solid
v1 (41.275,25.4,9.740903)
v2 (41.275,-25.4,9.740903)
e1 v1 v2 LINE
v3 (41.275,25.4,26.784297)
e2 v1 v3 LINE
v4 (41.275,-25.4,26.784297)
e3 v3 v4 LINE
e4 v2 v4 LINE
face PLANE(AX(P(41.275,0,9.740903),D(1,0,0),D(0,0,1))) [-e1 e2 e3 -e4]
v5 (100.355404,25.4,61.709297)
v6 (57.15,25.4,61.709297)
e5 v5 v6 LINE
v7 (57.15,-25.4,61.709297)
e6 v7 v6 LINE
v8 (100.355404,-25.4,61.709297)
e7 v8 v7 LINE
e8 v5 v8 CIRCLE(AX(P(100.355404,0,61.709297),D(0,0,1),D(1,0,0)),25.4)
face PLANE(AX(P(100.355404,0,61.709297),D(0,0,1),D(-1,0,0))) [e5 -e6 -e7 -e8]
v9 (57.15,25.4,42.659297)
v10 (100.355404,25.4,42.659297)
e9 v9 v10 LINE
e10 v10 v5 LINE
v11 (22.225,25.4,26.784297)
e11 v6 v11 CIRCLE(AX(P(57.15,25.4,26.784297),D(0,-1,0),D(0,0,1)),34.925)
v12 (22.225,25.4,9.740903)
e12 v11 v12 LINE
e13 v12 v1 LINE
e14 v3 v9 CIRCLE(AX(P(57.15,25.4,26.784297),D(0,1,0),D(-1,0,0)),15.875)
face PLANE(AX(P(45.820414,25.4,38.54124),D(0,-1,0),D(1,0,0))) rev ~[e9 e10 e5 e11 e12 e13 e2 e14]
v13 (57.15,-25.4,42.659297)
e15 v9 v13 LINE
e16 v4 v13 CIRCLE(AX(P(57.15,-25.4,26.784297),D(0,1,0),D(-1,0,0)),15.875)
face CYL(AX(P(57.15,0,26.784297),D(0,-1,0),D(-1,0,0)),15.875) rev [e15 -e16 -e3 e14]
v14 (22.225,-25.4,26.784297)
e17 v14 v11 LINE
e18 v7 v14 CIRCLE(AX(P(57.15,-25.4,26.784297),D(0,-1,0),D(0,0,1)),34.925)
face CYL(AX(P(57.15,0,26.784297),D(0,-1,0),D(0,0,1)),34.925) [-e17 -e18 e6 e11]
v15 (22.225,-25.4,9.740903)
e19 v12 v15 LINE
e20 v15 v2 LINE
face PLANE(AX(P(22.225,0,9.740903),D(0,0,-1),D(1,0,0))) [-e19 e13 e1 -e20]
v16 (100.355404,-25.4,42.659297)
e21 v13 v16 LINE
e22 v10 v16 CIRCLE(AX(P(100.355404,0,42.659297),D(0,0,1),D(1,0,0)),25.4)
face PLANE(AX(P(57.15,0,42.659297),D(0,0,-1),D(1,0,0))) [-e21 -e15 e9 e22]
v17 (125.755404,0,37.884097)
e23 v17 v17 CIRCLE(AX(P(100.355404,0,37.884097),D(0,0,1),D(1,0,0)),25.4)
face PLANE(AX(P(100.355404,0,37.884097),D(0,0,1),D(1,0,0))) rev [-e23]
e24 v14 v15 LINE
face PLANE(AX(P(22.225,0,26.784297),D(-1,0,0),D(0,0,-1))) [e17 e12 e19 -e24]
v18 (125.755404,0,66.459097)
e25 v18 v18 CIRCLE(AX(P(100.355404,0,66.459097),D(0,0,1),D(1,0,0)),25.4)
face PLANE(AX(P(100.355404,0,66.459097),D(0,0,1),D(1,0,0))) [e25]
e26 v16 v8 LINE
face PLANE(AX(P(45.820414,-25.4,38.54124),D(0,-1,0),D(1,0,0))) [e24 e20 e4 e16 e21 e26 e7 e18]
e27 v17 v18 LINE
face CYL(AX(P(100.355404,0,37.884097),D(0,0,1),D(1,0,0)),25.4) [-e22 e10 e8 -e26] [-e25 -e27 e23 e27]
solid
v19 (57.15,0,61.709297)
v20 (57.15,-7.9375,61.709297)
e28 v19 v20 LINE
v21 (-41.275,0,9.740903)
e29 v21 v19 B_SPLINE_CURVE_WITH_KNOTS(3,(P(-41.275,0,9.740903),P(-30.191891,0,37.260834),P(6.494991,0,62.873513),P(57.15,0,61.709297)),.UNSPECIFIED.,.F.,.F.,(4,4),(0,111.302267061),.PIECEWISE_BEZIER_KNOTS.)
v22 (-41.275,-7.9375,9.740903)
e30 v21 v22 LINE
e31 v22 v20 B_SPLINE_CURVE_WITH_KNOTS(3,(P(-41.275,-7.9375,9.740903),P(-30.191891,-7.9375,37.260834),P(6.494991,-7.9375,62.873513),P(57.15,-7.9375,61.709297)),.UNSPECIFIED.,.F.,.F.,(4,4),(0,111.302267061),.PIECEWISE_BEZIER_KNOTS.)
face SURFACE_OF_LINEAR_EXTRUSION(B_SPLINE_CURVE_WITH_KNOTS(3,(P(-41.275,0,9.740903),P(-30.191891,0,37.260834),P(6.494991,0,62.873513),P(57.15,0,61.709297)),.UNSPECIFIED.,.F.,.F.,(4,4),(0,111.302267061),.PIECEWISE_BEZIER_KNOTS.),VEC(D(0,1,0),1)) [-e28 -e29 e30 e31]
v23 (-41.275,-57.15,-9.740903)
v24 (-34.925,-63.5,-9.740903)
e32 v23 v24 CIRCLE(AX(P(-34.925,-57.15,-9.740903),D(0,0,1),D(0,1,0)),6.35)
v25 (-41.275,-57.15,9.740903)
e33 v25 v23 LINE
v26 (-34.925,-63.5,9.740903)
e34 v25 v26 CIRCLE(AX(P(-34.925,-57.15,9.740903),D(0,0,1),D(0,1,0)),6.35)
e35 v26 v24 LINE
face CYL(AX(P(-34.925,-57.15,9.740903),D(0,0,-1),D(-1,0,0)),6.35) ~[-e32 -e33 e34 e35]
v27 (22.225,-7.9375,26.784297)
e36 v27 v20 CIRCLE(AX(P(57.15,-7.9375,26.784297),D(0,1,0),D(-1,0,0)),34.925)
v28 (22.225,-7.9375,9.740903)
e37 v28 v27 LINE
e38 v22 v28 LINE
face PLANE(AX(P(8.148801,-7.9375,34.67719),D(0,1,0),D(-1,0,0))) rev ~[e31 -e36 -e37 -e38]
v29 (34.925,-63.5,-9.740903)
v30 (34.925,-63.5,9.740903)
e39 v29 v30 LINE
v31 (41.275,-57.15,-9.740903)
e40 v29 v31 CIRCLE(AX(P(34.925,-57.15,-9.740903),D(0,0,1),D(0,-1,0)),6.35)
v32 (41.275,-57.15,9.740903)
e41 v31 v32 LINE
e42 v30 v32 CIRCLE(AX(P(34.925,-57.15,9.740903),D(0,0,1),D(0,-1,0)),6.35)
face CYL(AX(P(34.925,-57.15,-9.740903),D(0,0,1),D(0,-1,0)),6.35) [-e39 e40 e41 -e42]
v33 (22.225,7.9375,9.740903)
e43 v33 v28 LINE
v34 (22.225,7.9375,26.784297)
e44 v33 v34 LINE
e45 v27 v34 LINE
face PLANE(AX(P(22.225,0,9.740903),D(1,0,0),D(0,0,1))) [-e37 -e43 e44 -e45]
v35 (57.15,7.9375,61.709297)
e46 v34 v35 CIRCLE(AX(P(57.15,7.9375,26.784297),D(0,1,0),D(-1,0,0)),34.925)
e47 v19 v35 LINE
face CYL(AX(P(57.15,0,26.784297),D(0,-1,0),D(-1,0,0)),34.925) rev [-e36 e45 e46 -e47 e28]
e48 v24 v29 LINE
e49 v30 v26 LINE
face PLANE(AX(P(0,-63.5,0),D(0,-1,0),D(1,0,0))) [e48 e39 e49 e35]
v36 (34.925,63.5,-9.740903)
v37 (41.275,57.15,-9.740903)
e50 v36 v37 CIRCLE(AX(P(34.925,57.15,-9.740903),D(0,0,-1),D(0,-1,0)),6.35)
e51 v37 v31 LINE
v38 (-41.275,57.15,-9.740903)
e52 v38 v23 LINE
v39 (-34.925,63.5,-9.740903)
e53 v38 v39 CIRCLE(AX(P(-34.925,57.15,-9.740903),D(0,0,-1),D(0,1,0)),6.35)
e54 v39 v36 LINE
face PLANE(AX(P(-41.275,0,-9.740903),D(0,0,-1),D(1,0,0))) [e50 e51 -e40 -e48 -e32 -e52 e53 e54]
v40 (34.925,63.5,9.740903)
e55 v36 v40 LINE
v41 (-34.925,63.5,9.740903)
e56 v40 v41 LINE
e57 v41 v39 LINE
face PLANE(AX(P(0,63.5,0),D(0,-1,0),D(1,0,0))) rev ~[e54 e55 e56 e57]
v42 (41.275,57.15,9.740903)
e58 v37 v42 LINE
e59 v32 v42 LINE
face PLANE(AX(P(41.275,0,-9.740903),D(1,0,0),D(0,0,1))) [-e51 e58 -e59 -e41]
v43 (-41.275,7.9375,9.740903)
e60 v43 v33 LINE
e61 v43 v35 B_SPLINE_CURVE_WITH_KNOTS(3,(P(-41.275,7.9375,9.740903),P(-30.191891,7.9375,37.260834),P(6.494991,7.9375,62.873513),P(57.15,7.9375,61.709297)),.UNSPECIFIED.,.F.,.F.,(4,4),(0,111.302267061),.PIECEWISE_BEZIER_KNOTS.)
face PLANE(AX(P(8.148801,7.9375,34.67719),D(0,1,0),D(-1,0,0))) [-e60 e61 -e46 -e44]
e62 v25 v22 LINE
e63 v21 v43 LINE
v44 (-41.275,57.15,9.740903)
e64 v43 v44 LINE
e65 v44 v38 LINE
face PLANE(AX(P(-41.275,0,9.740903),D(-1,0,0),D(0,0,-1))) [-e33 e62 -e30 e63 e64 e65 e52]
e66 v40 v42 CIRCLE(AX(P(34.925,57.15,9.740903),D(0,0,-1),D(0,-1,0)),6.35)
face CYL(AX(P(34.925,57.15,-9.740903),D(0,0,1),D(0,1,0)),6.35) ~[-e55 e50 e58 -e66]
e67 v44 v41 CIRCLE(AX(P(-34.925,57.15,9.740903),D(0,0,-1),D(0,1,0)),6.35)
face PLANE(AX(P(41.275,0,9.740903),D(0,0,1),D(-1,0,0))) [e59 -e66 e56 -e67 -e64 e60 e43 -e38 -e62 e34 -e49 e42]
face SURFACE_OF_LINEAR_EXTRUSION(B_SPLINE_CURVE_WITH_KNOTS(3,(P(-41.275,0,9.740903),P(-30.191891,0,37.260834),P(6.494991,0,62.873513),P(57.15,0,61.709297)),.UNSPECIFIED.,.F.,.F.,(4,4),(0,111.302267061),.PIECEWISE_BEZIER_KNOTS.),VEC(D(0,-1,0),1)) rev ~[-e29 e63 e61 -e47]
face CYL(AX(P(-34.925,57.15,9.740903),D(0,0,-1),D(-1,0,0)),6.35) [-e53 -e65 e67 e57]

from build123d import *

# Parameters (mm, degrees)
F1_DEPTH = 63.5
F0_W     = 25.4
F0_H     = 19.05
F2_DEPTH = 25.4
F3_DEPTH = 7.9375
F5_R     = 6.35


with BuildPart() as f1:
    # F0 (on Front) → F1 (new body, symmetric)
    with BuildSketch(Plane.XZ):
        Polygon((22.225, 9.7409027457), (-41.275, 9.7409027457), (-41.275, -9.7409027457), (41.275, -9.7409027457), (41.275, 9.7409027457), align=None)
    extrude(amount=F1_DEPTH, both=True)

    # F0 (on Front) → F3 (join, symmetric)
    with BuildSketch(Plane.XZ):
        with BuildLine():
            add(Edge.make_bspline(
                [(-41.275, 9.7409027457), (-30.1918908954, 37.2608341277), (6.4949910156, 62.8735125065), (57.15, 61.7092972543)],
                knots=[0, 0, 0, 0, 111.3022670605, 111.3022670605, 111.3022670605, 111.3022670605], degree=3))
            Line((-41.275, 9.7409027457), (22.225, 9.7409027457))
            Line((22.225, 9.7409027457), (22.225, 26.7842972543))
            ThreePointArc((22.225, 26.7842972543), (32.4542956671, 51.4800015873), (57.15, 61.7092972543))
        make_face()
    extrude(amount=F3_DEPTH, both=True)

    # F5
    f5_edges = [f1.edges().sort_by_distance(p)[0] for p in [
        (-41.275, -63.5, 0),
        (41.275, -63.5, 0),
        (41.275, 63.5, 0),
        (-41.275, 63.5, 0),
    ]]
    fillet(f5_edges, radius=F5_R)


with BuildPart() as f2:
    # F0 (on Front) → F2 (new body, symmetric)
    with BuildSketch(Plane.XZ):
        with BuildLine():
            Line((22.225, 26.7842972543), (22.225, 9.7409027457))
            Line((22.225, 9.7409027457), (41.275, 9.7409027457))
            Line((41.275, 9.7409027457), (41.275, 26.7842972543))
            ThreePointArc((41.275, 26.7842972543), (45.9246798487, 38.0096174057), (57.15, 42.6592972543))
            Line((57.15, 42.6592972543), (74.9554038295, 42.6592972543))
            Line((74.9554038295, 42.6592972543), (74.9554038295, 61.7092972543))
            Line((74.9554038295, 61.7092972543), (57.15, 61.7092972543))
            ThreePointArc((57.15, 61.7092972543), (32.4542956671, 51.4800015873), (22.225, 26.7842972543))
        make_face()
        with Locations((87.6554038295, 52.1842972543)):
            Rectangle(F0_W, F0_H)
    extrude(amount=F2_DEPTH, both=True)

    # F0 (on Front) → F4 (revolve)
    with BuildSketch(Plane.XZ):
        Polygon((100.3554038295, 66.4590972543), (100.3554038295, 61.7092972543), (100.3554038295, 42.6592972543), (100.3554038295, 37.8840972543), (125.7554038295, 37.8840972543), (125.7554038295, 66.4590972543), align=None)
    revolve(axis=Axis((100.3554038295, 0, 52.1715972543), (0, 0, 1)))


solid = Compound([f1.part, f2.part])
